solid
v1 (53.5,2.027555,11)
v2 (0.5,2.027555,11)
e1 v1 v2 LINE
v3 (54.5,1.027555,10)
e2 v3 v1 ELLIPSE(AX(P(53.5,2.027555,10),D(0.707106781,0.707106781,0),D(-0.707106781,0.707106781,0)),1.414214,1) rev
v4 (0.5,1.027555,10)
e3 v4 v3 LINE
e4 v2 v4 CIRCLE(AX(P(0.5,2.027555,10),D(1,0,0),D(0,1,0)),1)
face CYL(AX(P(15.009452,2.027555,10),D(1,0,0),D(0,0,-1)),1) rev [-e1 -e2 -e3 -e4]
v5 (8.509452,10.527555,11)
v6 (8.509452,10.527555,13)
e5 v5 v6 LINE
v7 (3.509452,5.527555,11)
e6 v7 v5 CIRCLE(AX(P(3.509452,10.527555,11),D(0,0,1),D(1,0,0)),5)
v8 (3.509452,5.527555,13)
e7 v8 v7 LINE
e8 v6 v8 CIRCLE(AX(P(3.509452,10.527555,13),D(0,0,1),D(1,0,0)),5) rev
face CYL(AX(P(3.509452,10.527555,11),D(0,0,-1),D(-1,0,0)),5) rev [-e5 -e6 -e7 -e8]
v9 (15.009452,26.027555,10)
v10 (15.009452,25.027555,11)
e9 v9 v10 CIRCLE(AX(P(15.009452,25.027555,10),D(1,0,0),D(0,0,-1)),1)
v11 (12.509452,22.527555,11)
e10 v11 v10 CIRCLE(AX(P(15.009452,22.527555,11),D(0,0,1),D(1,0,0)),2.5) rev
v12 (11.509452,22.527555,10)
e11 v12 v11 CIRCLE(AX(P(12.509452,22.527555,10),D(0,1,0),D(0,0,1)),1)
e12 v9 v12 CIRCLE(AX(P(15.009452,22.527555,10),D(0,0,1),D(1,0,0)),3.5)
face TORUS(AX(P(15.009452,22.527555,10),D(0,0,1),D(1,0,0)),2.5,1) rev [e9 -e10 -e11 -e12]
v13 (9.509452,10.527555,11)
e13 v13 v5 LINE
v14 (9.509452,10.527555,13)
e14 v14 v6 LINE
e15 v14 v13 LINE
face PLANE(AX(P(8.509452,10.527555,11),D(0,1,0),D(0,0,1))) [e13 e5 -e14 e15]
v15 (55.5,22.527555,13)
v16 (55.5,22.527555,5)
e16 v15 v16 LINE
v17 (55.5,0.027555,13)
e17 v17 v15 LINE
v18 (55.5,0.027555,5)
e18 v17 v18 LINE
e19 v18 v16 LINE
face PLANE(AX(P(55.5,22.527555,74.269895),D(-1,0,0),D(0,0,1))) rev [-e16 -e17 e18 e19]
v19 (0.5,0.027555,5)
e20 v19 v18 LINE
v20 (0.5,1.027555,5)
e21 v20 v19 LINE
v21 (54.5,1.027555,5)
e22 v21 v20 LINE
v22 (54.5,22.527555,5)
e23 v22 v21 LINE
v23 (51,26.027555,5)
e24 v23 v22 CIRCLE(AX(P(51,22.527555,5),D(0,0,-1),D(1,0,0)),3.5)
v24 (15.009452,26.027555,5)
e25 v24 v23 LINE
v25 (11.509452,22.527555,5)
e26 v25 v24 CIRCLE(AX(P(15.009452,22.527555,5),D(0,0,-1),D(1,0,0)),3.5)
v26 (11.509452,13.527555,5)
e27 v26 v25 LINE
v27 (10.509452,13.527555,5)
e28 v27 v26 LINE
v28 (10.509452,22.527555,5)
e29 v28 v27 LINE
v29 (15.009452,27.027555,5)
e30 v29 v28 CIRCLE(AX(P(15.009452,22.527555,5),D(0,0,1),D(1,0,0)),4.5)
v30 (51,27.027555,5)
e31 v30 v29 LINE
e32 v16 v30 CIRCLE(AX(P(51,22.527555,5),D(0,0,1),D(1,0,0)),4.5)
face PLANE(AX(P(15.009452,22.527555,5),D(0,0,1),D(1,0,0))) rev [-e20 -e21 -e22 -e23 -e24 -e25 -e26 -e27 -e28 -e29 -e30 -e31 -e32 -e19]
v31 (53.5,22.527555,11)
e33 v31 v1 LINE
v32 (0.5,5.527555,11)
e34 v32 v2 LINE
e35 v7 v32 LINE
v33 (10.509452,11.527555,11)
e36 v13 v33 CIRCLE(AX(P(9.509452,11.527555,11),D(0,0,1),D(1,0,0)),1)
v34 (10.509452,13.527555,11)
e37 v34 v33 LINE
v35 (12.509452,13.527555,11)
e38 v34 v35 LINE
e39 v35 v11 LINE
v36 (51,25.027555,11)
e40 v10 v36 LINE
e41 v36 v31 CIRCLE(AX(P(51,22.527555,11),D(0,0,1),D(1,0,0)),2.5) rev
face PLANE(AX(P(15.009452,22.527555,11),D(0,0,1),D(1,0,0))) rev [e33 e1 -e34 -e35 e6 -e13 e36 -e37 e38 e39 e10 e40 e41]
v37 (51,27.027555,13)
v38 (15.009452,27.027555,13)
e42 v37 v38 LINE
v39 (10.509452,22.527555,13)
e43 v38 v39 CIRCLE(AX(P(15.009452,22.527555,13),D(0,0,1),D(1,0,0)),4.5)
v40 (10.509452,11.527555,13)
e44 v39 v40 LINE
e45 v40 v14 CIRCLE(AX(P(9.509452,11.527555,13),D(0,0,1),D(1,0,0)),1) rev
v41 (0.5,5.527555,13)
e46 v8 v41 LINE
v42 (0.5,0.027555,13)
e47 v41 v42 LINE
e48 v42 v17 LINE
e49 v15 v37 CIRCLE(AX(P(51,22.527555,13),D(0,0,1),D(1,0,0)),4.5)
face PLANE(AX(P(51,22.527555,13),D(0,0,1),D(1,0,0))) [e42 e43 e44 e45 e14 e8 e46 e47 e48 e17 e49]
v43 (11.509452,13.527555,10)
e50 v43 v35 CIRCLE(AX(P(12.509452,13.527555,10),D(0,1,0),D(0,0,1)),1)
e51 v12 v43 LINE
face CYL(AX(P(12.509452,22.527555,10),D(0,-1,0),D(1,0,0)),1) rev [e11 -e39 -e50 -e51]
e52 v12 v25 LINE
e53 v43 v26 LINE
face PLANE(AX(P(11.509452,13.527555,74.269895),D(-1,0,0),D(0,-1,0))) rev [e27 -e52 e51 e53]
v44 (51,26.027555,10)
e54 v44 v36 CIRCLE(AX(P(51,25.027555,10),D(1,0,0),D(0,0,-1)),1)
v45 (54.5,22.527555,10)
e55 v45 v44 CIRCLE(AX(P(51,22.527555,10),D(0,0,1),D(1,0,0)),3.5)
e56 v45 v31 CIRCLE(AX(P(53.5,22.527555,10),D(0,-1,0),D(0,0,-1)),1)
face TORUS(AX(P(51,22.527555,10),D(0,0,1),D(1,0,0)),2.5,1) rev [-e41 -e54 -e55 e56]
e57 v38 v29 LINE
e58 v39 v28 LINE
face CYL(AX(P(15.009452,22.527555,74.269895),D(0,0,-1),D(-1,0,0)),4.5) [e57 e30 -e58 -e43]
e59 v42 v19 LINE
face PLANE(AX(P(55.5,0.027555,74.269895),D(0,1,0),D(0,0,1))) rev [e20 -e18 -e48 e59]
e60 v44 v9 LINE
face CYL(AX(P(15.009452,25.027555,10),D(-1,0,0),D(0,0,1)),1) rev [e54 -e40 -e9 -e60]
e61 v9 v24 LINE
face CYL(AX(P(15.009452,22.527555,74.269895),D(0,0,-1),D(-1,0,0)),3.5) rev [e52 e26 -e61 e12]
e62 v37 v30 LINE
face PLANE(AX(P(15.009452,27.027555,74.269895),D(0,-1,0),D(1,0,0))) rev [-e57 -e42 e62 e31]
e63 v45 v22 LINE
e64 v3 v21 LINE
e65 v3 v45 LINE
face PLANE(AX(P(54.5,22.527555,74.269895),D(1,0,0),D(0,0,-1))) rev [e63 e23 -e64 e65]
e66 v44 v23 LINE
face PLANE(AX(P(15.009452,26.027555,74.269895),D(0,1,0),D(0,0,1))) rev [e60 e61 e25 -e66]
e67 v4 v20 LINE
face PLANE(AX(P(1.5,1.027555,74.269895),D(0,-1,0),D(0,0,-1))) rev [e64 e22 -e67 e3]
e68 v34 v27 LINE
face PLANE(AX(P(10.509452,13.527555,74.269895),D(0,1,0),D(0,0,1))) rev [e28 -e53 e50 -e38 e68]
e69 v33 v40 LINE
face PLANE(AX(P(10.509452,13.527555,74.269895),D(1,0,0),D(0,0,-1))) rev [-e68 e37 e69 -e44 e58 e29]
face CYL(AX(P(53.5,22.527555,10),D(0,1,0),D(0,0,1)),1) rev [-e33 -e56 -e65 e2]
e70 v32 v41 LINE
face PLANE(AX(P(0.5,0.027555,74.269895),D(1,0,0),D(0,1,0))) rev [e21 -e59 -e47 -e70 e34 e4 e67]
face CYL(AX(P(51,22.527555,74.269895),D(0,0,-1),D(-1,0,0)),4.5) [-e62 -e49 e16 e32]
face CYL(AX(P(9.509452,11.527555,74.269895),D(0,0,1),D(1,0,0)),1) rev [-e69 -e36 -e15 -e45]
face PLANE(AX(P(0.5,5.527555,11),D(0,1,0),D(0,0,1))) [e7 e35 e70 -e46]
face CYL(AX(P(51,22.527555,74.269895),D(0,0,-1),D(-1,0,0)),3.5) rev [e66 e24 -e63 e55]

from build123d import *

# Parameters (mm, degrees)
BOSS_EXTRUDE1_START = 5
BOSS_EXTRUDE1_DEPTH = 8
BOSS_EXTRUDE2_START = -2
BOSS_EXTRUDE2_DEPTH = 2
FILLET1_R           = 5
FILLET2_R           = 1
FILLET3_R           = 1


with BuildPart() as part:
    # Sketch1 → Boss-Extrude1 (new body)
    with BuildSketch(Plane.XY.offset(BOSS_EXTRUDE1_START)):
        with BuildLine():
            Line((11.509451629, 13.52755518), (11.509451629, 22.52755518))
            ThreePointArc((11.509451629, 22.52755518), (12.534577895, 25.002428914), (15.009451629, 26.02755518))
            Line((15.009451629, 26.02755518), (51, 26.02755518))
            ThreePointArc((51, 26.02755518), (53.474873734, 25.002428914), (54.5, 22.52755518))
            Line((54.5, 22.52755518), (54.5, 1.02755518))
            Line((54.5, 1.02755518), (1.5, 1.02755518))
            Line((1.5, 1.02755518), (0.5, 1.02755518))
            Line((0.5, 1.02755518), (0.5, 0.02755518))
            Line((0.5, 0.02755518), (55.5, 0.02755518))
            Line((55.5, 0.02755518), (55.5, 22.52755518))
            ThreePointArc((55.5, 22.52755518), (54.181980515, 25.709535695), (51, 27.02755518))
            Line((51, 27.02755518), (15.009451629, 27.02755518))
            ThreePointArc((15.009451629, 27.02755518), (11.827471114, 25.709535695), (10.509451629, 22.52755518))
            Line((10.509451629, 22.52755518), (10.509451629, 13.52755518))
            Line((10.509451629, 13.52755518), (11.509451629, 13.52755518))
        make_face()
    extrude(amount=BOSS_EXTRUDE1_DEPTH)

    # Sketch2 → Boss-Extrude2 (add)
    with BuildSketch(Plane.XY.offset(13).offset(BOSS_EXTRUDE2_START)):
        with BuildLine():
            Line((0.5, 5.52755518), (8.509451629, 5.52755518))
            Line((8.509451629, 5.52755518), (8.509451629, 10.52755518))
            Line((8.509451629, 10.52755518), (10.509451629, 10.52755518))
            Line((10.509451629, 10.52755518), (10.509451629, 13.52755518))
            Line((10.509451629, 13.52755518), (10.509451629, 22.52755518))
            ThreePointArc((10.509451629, 22.52755518), (11.827471114, 25.709535695), (15.009451629, 27.02755518))
            Line((15.009451629, 27.02755518), (51, 27.02755518))
            ThreePointArc((51, 27.02755518), (54.181980515, 25.709535695), (55.5, 22.52755518))
            Line((55.5, 22.52755518), (55.5, 0.02755518))
            Line((55.5, 0.02755518), (0.5, 0.02755518))
            Line((0.5, 0.02755518), (0.5, 1.02755518))
            Line((0.5, 1.02755518), (0.5, 5.52755518))
        make_face()
    extrude(amount=BOSS_EXTRUDE2_DEPTH)

    # Fillet1
    fillet1_edges = [part.edges().sort_by_distance(p)[0] for p in [
        (8.509451629, 5.52755518, 12),
    ]]
    fillet(fillet1_edges, radius=FILLET1_R - 0.0001)  # a hair under: the kernel refuses the full size

    # Fillet2
    fillet2_edges = [part.edges().sort_by_distance(p)[0] for p in [
        (10.509451629, 10.52755518, 12),
    ]]
    fillet(fillet2_edges, radius=FILLET2_R)

    # Fillet3
    fillet3_edges = [part.edges().sort_by_distance(p)[0] for p in [
        (11.509451629, 18.02755518, 11),
        (54.5, 11.77755518, 11),
        (27.5, 1.02755518, 11),
        (12.534577895, 25.002428914, 11),
        (33.004725815, 26.02755518, 11),
        (53.474873734, 25.002428914, 11),
    ]]
    fillet(fillet3_edges, radius=FILLET3_R)


solid = part.part
